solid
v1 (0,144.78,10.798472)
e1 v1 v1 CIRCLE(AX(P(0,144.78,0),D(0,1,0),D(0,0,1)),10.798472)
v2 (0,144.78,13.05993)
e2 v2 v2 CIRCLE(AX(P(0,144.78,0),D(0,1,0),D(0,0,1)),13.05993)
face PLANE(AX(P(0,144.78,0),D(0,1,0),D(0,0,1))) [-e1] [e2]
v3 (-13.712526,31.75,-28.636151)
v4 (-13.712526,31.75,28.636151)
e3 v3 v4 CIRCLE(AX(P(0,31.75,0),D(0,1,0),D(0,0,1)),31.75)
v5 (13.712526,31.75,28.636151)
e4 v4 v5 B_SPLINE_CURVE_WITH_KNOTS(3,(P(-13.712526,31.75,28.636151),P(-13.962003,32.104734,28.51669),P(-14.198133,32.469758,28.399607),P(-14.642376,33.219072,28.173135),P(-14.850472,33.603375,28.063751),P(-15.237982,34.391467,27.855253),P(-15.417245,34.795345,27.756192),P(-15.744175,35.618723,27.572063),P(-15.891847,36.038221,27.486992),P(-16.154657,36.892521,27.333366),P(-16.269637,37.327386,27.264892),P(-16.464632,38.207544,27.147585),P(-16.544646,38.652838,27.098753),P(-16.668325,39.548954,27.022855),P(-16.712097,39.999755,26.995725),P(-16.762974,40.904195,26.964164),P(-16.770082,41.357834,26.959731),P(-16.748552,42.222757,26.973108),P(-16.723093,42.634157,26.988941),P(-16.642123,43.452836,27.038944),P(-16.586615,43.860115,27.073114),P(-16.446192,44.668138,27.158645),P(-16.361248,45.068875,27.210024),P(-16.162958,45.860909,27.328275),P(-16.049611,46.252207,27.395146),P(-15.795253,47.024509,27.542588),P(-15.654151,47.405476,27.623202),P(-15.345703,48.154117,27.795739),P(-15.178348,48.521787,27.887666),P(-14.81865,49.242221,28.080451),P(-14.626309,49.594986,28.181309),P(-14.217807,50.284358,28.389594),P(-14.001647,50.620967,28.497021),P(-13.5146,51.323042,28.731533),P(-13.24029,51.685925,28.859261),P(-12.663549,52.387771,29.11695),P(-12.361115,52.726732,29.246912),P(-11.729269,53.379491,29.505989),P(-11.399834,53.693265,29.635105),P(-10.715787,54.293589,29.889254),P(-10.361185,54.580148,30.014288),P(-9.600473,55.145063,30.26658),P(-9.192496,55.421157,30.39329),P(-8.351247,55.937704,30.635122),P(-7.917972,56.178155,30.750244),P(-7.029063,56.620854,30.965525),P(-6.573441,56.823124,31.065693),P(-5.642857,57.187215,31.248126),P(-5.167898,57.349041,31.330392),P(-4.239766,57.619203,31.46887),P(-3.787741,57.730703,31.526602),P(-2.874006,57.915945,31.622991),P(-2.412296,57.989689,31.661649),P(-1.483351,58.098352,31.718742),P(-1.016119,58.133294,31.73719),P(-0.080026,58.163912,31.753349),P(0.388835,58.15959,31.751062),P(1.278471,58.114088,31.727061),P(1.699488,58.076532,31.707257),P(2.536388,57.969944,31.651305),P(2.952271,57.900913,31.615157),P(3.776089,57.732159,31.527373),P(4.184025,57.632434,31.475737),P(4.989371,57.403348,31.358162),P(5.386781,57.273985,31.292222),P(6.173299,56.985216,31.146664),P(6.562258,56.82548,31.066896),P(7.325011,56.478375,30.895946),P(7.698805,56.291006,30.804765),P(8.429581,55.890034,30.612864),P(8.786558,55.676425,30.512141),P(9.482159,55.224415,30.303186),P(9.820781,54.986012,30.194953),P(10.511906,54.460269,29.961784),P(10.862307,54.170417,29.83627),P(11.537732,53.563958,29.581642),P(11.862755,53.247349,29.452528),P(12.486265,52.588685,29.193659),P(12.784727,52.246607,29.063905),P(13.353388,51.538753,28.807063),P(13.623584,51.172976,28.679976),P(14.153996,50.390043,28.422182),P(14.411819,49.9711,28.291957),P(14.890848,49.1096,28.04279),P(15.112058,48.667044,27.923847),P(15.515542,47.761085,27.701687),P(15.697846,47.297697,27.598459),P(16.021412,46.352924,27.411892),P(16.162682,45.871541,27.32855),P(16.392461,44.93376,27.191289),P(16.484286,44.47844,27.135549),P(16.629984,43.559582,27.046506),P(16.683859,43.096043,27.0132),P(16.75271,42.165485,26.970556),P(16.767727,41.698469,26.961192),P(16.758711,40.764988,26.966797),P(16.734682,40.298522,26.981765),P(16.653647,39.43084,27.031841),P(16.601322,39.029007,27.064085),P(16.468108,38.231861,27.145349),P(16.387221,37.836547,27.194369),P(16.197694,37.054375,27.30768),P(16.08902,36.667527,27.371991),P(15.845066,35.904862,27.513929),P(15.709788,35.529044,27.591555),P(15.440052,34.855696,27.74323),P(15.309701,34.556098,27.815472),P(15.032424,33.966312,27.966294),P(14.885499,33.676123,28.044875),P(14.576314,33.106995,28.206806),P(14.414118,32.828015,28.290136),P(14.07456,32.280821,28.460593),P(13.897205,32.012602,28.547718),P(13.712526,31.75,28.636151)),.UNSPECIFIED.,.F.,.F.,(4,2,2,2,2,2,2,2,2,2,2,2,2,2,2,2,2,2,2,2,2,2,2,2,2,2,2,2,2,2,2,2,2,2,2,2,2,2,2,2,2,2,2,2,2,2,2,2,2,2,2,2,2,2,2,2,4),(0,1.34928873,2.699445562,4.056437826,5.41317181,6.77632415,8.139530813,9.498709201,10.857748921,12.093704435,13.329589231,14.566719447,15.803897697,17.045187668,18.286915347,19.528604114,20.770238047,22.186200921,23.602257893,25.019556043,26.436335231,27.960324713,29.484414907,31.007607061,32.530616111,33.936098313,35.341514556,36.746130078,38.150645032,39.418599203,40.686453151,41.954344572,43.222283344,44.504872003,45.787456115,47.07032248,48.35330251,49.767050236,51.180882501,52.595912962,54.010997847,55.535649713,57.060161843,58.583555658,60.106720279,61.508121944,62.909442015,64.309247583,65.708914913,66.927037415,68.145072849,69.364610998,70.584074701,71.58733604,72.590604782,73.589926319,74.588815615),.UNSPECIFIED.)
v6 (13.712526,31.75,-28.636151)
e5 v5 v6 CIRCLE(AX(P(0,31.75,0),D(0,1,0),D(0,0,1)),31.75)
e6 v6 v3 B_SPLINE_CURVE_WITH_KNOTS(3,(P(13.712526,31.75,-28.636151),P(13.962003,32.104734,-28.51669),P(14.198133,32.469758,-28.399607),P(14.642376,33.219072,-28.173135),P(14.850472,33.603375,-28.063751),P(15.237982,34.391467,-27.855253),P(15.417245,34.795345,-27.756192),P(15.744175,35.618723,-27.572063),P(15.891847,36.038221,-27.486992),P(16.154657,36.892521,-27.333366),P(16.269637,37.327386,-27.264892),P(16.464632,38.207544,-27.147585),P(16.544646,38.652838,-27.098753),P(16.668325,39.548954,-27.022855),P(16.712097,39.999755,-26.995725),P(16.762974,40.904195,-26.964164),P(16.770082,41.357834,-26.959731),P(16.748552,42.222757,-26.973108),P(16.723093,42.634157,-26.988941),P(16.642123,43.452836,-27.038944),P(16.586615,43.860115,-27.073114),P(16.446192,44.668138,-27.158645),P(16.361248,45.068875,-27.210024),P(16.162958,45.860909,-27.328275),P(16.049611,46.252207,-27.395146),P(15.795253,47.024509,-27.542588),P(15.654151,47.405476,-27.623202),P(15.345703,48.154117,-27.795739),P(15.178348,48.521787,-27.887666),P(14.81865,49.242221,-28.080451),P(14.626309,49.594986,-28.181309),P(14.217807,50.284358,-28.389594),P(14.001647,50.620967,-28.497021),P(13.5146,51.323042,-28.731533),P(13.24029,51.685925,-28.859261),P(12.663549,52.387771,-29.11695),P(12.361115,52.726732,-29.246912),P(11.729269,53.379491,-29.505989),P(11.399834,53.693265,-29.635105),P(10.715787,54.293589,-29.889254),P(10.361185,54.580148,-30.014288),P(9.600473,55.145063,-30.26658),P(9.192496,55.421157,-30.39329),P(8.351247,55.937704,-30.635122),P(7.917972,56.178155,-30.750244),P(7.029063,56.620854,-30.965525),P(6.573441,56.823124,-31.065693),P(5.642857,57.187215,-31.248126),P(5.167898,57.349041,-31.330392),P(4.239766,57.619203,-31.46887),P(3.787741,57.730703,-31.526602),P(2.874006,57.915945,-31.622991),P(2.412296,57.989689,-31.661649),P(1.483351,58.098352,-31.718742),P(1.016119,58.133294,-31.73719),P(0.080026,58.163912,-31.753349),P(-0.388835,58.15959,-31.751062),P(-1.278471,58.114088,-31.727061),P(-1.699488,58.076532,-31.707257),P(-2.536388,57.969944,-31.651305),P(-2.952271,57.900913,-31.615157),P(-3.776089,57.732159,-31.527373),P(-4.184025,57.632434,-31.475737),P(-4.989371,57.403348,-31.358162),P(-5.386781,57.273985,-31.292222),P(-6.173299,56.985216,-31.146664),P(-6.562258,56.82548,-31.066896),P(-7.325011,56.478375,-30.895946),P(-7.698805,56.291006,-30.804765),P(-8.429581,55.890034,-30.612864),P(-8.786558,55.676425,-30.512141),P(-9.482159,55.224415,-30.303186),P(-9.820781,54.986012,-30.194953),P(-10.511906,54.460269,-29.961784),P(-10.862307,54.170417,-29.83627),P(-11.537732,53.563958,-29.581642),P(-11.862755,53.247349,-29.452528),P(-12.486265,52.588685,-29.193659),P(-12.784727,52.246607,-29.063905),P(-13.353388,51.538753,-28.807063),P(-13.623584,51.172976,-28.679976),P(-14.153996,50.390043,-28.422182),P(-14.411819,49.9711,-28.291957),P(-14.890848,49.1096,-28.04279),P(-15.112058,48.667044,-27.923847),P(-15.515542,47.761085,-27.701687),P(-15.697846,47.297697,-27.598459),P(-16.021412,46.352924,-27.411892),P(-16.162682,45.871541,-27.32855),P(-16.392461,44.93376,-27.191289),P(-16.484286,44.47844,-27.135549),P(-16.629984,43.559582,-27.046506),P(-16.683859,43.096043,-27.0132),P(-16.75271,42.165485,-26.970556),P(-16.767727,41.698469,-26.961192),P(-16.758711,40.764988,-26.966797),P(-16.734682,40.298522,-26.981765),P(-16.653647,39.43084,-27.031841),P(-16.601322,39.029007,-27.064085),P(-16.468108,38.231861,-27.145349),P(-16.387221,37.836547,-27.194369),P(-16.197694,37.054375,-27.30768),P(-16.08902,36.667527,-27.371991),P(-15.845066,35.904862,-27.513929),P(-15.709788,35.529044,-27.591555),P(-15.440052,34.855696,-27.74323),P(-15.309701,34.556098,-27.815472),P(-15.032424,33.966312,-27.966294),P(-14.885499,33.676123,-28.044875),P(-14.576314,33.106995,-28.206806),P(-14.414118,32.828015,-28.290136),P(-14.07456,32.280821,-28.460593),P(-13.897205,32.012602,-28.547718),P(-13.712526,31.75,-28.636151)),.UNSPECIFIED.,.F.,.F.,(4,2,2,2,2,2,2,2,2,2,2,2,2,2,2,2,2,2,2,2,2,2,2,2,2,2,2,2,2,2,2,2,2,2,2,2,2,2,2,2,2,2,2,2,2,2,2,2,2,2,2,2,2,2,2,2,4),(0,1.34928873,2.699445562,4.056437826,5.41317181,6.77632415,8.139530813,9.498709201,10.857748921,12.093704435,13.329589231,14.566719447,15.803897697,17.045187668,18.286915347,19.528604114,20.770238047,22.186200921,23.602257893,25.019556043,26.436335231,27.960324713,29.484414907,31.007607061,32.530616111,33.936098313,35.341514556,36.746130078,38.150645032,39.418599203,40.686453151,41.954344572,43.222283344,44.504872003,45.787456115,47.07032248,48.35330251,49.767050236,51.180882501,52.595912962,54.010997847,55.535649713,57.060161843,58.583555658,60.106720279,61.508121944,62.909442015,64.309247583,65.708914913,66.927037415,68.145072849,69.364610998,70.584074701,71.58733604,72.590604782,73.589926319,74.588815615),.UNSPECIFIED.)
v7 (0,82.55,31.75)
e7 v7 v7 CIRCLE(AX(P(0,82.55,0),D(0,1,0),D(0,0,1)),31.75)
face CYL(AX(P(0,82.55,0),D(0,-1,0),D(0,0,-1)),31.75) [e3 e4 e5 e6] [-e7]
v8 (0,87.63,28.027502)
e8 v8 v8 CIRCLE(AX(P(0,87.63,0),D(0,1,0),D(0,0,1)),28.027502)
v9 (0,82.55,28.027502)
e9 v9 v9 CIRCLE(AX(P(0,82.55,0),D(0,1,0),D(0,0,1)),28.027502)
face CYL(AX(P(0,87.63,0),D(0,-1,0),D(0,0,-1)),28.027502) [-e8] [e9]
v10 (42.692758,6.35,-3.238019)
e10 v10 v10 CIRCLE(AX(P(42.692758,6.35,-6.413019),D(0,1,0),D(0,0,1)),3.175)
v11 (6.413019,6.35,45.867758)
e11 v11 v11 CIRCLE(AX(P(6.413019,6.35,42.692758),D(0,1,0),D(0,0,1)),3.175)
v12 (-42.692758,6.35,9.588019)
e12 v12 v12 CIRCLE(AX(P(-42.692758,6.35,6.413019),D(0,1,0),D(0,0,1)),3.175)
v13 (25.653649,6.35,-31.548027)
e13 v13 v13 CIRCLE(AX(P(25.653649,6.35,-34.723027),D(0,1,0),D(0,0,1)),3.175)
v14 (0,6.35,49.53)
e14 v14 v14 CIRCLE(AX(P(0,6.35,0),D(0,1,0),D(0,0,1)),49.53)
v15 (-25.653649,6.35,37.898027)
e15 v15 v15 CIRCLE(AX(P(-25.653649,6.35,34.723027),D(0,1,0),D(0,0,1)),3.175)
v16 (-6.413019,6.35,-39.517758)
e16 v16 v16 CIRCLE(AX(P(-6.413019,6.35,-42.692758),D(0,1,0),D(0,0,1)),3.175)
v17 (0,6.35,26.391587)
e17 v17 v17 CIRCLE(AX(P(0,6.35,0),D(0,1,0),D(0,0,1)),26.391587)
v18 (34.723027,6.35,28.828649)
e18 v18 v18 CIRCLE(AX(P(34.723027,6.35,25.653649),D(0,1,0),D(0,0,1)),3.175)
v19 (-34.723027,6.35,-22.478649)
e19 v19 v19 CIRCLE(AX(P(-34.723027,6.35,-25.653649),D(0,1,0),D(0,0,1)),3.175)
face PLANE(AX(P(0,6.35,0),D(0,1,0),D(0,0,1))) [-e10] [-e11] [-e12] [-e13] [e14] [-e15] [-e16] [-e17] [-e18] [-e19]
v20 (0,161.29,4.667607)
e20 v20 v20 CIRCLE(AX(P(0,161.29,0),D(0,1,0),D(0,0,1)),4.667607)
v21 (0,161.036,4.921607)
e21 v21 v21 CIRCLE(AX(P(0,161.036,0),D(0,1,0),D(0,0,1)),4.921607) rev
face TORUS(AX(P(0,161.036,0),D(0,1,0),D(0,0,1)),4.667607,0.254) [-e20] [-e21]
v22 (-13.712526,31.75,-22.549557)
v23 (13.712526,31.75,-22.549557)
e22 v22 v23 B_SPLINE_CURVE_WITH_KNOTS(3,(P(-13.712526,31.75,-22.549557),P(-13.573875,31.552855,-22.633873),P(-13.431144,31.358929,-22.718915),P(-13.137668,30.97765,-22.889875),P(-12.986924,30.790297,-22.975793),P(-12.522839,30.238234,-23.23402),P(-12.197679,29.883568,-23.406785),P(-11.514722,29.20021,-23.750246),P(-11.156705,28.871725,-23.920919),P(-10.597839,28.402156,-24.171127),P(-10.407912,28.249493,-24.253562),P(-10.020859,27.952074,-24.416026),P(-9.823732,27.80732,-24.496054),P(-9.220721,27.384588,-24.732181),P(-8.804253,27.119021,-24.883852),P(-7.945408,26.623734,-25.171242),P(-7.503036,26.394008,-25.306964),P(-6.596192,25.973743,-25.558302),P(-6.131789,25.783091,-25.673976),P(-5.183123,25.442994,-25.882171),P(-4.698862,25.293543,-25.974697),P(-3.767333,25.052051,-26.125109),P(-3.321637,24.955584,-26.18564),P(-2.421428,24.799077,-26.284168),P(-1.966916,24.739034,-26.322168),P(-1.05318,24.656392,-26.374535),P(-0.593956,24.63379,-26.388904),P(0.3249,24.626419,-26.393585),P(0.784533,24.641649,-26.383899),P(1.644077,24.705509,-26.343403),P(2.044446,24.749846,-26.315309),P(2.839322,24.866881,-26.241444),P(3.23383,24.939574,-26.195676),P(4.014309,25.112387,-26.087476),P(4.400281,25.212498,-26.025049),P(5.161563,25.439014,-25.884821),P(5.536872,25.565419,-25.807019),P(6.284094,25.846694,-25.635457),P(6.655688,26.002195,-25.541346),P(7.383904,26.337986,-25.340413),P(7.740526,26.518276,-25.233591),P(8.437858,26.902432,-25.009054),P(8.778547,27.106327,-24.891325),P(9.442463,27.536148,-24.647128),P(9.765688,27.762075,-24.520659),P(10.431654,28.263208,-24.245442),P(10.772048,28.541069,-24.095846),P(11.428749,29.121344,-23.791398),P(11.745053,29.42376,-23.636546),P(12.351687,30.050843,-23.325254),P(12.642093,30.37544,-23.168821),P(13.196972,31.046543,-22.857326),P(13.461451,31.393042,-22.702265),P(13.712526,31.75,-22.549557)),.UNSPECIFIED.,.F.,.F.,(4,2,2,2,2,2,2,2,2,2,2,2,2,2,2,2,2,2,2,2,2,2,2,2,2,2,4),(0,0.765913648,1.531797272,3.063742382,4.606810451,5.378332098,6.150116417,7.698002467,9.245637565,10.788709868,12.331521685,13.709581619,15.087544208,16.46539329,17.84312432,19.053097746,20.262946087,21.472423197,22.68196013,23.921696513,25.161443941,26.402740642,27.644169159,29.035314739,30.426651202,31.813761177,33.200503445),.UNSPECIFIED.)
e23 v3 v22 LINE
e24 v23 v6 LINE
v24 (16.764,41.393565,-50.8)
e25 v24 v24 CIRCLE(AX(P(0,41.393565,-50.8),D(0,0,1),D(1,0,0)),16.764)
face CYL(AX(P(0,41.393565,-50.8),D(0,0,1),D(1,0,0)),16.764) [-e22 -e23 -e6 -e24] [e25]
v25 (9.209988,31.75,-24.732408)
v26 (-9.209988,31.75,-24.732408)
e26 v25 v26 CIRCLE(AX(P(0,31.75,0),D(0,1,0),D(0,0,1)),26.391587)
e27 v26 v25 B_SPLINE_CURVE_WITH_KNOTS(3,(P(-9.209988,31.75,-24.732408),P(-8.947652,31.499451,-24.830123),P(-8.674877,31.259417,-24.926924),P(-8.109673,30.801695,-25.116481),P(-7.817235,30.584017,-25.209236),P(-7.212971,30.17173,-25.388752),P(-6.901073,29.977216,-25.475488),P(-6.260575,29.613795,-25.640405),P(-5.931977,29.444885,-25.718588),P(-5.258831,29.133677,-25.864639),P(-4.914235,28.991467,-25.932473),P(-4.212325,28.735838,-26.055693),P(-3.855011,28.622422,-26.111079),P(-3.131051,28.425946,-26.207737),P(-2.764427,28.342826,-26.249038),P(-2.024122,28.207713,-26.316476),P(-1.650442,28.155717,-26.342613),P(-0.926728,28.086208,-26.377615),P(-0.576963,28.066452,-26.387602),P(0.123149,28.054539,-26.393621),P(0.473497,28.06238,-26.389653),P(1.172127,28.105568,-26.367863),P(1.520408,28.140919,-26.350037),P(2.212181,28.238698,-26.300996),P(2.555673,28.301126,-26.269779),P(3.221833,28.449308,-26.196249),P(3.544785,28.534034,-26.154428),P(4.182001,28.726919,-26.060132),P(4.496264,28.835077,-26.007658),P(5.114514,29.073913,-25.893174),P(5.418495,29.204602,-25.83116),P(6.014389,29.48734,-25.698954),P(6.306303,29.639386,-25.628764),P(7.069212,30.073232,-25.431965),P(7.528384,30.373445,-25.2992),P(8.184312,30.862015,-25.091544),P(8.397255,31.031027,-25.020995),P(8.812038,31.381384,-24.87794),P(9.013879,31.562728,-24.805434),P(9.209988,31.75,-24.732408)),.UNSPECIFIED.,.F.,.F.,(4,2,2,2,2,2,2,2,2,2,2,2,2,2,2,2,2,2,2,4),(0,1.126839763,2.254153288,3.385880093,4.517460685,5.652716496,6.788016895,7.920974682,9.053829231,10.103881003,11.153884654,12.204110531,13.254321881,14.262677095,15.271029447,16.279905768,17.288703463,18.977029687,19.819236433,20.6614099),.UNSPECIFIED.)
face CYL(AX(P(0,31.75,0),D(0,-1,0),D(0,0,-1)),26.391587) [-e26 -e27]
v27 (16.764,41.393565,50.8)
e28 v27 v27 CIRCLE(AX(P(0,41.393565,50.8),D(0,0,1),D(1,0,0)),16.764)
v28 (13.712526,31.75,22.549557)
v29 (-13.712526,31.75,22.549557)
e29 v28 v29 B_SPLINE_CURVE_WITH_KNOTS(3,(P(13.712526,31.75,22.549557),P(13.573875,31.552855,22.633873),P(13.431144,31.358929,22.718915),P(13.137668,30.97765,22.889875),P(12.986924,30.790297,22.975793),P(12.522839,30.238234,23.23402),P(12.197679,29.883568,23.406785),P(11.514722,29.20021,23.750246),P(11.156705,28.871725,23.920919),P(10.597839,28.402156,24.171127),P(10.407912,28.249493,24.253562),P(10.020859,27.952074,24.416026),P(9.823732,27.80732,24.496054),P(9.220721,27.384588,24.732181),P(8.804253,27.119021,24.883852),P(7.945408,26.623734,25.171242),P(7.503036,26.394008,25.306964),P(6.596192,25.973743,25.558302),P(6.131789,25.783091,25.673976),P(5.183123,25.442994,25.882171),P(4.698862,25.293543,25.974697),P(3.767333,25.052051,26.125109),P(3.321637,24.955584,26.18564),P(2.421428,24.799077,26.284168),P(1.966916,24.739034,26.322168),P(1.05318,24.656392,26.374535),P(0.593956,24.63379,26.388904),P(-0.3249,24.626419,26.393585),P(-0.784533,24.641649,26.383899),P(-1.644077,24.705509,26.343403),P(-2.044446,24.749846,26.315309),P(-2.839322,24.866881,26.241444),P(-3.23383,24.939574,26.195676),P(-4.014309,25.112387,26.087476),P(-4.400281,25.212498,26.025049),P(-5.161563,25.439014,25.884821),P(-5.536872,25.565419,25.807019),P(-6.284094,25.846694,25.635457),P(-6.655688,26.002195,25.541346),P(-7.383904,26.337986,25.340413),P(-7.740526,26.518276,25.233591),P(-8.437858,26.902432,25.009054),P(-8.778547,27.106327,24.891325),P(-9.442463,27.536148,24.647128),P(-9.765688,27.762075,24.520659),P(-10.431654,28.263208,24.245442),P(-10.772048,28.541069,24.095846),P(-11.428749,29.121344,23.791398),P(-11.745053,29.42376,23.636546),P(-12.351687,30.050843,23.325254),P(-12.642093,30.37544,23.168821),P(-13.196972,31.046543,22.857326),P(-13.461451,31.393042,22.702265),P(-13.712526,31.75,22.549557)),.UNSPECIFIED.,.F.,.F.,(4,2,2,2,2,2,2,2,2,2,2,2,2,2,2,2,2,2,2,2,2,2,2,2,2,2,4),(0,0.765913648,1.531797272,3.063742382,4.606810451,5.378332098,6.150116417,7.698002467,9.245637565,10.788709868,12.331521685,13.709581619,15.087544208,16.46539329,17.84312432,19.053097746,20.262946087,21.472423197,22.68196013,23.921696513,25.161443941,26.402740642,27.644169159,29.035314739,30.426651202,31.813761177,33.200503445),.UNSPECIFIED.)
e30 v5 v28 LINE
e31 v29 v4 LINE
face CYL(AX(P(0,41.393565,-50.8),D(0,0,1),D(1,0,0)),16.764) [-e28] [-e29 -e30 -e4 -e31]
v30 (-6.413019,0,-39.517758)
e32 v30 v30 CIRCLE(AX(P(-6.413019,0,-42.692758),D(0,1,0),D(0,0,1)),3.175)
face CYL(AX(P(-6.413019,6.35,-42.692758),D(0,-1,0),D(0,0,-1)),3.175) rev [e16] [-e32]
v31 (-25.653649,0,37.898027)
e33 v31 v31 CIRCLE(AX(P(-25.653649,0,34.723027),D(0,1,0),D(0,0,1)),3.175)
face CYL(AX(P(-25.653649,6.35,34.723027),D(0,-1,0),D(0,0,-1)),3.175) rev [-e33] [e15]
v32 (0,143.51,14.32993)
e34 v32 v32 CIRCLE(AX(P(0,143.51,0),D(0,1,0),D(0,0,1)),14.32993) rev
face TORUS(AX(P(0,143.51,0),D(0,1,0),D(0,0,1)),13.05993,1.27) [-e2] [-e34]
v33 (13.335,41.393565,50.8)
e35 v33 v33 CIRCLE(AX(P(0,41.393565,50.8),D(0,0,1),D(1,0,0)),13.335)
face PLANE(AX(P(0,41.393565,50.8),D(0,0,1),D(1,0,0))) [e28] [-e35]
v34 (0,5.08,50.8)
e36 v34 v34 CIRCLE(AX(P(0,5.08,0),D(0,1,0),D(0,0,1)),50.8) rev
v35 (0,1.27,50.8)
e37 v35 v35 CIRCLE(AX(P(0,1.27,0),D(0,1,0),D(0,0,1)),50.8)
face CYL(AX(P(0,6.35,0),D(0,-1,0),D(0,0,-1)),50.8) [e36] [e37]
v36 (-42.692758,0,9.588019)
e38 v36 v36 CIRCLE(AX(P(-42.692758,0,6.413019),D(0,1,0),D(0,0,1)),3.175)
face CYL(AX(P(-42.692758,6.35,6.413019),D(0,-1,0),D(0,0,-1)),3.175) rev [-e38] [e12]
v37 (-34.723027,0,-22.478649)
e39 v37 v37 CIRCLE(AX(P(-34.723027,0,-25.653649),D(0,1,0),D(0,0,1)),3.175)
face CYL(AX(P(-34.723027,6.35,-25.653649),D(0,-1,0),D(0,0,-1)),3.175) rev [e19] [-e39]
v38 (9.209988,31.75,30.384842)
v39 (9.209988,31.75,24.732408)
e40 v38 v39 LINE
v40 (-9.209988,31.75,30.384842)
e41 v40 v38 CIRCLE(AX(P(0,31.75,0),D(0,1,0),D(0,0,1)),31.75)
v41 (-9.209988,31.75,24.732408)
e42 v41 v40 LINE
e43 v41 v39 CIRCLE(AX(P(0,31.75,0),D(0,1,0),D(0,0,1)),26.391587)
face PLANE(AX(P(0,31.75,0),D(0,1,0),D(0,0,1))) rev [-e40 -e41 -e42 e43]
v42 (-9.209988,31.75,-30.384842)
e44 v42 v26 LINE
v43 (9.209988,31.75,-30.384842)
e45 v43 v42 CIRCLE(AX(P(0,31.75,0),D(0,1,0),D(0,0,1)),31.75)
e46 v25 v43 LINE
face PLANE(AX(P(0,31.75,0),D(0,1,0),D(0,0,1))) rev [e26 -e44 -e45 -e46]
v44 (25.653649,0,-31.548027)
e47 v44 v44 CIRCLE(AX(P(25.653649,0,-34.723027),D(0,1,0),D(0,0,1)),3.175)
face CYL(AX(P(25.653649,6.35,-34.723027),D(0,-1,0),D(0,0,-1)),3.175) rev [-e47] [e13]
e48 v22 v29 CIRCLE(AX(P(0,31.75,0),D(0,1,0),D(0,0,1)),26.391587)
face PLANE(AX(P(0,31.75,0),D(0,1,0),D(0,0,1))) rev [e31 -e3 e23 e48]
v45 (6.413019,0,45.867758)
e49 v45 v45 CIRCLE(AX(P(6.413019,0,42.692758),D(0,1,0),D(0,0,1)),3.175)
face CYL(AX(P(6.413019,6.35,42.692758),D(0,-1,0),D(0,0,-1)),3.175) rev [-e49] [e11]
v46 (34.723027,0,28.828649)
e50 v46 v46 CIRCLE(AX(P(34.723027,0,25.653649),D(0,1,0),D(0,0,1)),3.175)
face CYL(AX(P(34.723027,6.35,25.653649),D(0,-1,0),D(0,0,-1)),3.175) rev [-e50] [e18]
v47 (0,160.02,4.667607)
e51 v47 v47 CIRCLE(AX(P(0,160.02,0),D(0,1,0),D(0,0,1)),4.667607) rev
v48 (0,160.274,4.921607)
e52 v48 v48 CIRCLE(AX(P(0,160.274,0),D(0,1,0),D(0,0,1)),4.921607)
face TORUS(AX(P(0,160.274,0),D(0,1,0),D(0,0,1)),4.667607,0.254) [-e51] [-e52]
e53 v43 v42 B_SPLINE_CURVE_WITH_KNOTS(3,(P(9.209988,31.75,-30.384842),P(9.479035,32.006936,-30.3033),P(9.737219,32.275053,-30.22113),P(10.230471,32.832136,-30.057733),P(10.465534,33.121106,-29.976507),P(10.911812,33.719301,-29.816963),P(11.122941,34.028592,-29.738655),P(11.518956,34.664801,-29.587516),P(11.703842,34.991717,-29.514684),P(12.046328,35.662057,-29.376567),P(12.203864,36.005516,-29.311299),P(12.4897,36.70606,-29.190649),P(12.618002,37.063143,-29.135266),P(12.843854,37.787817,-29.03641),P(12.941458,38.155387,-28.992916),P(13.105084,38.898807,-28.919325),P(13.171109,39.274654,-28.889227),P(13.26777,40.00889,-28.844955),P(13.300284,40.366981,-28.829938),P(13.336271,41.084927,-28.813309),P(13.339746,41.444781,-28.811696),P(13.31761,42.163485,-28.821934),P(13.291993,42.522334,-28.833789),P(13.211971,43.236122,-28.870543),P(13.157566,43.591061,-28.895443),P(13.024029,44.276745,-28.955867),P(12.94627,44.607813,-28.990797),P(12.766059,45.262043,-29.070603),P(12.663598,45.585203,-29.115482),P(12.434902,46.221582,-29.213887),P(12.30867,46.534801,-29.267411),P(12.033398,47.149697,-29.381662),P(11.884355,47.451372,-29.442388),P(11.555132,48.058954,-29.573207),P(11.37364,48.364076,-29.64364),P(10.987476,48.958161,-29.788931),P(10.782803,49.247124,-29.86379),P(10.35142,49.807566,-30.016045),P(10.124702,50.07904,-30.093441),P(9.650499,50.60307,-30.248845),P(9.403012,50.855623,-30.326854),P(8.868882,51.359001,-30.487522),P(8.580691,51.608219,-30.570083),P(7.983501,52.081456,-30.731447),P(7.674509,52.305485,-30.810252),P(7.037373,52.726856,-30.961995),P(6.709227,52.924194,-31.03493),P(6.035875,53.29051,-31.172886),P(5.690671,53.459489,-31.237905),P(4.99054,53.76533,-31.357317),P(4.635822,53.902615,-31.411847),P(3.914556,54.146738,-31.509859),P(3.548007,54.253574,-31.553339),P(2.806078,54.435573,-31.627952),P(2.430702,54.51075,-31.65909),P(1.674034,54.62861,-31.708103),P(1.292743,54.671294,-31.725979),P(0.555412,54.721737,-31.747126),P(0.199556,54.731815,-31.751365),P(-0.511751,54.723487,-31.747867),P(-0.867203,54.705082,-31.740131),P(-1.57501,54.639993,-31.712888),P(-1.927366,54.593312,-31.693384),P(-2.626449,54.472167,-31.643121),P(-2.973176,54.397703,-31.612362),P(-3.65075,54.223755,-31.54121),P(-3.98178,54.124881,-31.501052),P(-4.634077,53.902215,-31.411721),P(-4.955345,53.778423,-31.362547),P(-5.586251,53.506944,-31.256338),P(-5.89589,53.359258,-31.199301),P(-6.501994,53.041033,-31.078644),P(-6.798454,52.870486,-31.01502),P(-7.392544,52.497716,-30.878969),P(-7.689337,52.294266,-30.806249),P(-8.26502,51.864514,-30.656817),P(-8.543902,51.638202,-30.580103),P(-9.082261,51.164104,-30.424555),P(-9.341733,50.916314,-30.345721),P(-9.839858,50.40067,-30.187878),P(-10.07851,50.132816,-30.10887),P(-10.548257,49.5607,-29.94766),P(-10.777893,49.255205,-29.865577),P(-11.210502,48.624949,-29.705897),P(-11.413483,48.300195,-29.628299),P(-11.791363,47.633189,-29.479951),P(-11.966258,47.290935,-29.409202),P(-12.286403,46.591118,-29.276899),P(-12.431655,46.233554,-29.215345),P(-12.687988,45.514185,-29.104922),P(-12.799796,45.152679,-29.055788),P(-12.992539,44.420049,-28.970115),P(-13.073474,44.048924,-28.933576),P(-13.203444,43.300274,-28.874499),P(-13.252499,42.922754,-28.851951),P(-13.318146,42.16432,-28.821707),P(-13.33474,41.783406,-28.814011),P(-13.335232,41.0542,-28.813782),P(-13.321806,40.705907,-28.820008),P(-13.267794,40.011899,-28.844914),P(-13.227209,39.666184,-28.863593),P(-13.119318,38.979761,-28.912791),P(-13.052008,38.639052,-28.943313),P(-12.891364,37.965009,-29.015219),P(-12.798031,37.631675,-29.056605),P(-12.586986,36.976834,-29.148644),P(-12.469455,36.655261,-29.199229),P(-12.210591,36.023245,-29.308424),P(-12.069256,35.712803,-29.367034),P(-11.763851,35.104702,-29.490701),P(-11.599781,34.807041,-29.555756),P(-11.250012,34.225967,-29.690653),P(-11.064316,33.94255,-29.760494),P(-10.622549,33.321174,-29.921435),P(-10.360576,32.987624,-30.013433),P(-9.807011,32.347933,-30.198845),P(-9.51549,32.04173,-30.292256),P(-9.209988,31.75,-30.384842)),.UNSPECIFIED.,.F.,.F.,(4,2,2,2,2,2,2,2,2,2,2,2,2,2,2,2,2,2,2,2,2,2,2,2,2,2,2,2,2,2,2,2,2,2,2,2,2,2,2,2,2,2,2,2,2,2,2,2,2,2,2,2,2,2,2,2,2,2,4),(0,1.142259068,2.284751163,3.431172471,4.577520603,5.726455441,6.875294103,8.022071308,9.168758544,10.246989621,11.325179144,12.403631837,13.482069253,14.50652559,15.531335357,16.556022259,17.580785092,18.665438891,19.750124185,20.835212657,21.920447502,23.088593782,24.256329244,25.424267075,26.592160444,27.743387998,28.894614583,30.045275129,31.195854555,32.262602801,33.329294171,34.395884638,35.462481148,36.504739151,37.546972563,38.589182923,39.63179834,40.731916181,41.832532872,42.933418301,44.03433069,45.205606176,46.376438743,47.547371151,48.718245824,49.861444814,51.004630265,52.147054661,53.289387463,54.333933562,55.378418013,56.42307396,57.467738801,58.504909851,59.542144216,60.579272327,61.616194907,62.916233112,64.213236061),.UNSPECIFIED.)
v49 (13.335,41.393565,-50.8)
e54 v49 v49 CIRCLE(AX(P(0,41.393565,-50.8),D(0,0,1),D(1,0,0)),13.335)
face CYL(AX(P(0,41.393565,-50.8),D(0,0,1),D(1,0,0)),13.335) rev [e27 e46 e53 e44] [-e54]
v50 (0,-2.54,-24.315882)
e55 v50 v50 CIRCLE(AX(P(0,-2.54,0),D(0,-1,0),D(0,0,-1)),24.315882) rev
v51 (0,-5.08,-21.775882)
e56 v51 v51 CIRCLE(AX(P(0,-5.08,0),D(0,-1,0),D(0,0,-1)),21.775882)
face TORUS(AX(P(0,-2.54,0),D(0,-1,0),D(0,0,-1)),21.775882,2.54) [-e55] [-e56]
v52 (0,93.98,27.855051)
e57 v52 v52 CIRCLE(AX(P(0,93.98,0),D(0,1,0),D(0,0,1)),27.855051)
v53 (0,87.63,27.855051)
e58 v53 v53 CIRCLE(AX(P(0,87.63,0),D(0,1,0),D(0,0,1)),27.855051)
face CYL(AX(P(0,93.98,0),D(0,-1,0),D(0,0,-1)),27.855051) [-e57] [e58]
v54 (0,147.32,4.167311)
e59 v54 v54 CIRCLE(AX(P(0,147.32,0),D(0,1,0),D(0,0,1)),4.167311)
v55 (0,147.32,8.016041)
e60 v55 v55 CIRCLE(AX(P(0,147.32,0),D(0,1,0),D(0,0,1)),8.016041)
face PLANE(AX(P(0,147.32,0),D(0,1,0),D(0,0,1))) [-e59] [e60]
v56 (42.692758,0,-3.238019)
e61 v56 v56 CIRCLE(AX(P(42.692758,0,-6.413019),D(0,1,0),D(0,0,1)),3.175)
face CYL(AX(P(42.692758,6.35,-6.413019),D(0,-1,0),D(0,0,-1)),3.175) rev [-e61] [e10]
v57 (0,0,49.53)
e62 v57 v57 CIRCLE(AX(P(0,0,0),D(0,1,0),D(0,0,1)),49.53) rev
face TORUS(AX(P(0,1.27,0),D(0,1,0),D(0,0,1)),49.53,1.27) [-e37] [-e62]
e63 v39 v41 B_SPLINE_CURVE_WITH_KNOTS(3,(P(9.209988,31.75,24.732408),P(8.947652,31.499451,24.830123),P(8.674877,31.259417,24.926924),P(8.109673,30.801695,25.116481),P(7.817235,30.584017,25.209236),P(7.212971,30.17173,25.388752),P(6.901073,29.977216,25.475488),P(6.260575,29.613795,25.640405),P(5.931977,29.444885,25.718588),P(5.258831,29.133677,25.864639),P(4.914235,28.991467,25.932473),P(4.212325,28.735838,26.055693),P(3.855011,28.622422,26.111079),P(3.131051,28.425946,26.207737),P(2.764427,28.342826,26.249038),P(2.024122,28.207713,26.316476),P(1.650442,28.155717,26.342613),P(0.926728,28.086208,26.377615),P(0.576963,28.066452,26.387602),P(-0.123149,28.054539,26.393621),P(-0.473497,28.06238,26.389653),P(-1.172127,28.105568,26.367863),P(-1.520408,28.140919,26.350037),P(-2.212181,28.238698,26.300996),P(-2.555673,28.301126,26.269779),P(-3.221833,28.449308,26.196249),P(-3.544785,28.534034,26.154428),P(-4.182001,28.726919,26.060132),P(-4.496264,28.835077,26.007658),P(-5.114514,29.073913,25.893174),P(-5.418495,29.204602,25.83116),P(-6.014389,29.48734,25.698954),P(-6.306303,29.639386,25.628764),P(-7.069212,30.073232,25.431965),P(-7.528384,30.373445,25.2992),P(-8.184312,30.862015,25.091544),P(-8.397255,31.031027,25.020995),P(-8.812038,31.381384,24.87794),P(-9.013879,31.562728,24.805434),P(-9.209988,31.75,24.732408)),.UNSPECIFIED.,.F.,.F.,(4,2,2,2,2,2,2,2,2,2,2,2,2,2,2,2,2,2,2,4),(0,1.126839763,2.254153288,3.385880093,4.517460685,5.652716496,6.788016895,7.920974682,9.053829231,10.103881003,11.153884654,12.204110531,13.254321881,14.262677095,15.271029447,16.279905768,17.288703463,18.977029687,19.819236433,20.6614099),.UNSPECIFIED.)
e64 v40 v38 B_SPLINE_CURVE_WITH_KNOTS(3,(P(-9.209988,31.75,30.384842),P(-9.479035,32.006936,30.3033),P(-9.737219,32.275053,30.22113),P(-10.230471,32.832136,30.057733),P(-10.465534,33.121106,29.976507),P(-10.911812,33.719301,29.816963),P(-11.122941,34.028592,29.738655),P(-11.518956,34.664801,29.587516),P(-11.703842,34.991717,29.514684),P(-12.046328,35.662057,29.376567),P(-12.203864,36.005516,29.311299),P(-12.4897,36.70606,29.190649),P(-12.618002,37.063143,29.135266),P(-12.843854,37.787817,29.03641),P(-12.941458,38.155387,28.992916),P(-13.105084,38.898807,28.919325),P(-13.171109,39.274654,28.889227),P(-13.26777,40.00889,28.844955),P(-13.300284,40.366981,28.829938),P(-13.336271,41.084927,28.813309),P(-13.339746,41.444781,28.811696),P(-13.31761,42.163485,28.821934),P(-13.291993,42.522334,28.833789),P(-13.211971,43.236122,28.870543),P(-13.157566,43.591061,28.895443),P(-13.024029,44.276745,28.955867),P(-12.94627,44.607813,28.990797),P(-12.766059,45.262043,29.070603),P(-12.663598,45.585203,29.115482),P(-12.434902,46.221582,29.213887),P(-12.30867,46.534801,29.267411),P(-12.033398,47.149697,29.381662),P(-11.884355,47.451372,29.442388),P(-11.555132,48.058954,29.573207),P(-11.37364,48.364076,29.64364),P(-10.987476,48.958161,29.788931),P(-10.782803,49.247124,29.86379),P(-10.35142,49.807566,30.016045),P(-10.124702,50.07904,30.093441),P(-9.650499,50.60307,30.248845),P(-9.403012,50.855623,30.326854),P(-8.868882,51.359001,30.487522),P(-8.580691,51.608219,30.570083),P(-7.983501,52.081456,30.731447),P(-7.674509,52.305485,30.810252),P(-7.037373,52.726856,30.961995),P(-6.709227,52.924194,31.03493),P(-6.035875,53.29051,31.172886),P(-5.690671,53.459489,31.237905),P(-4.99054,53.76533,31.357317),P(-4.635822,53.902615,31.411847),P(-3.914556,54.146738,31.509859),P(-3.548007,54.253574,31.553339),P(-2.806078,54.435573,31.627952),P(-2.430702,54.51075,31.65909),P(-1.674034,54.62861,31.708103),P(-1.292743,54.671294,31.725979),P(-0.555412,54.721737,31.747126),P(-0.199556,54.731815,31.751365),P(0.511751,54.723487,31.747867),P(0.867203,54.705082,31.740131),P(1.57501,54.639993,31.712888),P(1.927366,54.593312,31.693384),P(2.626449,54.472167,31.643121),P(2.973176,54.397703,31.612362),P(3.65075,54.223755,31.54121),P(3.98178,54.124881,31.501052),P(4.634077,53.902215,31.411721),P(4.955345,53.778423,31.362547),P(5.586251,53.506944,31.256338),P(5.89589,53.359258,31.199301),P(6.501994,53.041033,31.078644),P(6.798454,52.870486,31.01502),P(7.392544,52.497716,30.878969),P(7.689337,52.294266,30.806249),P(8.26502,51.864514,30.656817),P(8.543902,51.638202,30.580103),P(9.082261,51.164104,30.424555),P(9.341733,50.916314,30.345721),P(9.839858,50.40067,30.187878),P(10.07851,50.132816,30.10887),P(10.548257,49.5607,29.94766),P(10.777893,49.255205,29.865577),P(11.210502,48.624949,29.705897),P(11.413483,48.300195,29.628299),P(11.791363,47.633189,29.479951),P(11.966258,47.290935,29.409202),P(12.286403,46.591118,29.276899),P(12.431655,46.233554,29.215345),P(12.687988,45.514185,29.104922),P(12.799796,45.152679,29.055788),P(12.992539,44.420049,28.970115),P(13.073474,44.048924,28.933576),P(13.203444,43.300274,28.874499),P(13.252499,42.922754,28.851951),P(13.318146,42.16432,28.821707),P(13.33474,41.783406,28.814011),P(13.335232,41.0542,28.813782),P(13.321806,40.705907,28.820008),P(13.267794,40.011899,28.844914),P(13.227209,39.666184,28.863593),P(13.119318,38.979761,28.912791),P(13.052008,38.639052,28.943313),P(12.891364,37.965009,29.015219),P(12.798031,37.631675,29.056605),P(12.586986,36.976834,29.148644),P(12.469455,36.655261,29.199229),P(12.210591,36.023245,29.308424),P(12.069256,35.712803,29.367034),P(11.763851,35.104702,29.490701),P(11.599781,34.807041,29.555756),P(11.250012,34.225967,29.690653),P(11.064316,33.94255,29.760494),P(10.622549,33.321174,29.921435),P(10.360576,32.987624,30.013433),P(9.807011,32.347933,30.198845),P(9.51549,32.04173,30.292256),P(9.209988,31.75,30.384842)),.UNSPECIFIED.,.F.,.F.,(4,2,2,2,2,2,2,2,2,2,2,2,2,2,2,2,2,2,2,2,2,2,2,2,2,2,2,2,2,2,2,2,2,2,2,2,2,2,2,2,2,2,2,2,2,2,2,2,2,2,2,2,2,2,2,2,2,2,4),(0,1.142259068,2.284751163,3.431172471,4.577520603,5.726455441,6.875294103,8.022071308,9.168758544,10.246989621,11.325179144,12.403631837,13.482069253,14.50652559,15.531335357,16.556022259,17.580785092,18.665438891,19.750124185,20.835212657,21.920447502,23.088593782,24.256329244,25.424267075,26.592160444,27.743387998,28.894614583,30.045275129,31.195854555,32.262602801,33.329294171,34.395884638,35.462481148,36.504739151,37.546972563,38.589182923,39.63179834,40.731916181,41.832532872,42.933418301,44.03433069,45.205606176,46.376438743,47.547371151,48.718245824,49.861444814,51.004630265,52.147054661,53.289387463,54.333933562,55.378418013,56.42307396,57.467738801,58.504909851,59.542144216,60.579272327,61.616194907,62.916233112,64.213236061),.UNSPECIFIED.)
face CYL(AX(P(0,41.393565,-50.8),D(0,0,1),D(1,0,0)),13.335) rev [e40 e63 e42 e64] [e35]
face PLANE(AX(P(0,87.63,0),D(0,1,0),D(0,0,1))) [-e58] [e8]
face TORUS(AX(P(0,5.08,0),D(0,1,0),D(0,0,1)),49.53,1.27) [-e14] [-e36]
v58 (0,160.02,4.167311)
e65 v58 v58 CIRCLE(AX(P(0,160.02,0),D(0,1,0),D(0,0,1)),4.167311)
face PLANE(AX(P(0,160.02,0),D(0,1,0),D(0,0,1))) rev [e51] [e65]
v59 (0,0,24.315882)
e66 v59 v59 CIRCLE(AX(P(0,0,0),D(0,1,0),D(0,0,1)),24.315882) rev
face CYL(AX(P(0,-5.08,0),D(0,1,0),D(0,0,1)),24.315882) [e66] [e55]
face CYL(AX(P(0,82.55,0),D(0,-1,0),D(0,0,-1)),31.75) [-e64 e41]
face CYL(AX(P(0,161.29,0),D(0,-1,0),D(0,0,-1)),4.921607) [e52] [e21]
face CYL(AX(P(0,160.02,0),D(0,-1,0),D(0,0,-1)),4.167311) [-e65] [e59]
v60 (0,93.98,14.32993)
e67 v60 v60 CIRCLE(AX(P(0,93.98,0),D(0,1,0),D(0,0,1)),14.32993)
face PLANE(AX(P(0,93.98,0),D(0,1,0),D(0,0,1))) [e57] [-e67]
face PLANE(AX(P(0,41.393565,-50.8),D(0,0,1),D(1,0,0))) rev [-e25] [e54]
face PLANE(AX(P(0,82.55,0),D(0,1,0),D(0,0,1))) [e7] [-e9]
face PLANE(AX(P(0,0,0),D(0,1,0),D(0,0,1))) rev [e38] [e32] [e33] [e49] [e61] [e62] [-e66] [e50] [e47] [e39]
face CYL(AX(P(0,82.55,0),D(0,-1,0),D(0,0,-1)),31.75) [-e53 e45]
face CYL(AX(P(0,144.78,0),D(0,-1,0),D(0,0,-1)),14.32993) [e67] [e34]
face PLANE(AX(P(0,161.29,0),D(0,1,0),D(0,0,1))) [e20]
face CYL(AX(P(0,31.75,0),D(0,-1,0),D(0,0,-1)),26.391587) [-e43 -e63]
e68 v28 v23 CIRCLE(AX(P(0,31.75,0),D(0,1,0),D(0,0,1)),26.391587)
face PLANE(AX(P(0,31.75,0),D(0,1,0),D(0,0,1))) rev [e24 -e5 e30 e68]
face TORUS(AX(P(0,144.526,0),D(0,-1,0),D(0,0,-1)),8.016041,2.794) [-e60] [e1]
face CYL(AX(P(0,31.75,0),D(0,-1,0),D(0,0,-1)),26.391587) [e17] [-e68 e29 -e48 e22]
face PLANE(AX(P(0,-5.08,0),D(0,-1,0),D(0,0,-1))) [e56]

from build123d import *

# Parameters (mm, degrees)
SKETCH1_R                = 50.8
SKETCH1_R_2              = 3.175
BOSS_EXTRUDE1_DEPTH      = 6.35
FILLET1_R                = 1.27
FILLET2_R                = 1.27
SKETCH2_R                = 26.391587244
BOSS_EXTRUDE2_DEPTH      = 25.4
SKETCH3_R                = 31.75
BOSS_EXTRUDE3_DEPTH      = 50.8
BOSS_EXTRUDE4_DEPTH      = 50.8
BOSS_EXTRUDE4_DEPTH_BACK = 50.8
SKETCH4_R                = 16.764
SKETCH4_R_2              = 13.335
SKETCH5_R                = 24.315881968
BOSS_EXTRUDE5_DEPTH      = 5.08
FILLET3_R                = 2.54
SKETCH6_R                = 28.027502095
BOSS_EXTRUDE6_DEPTH      = 5.08
SKETCH7_R                = 27.855051321
BOSS_EXTRUDE7_DEPTH      = 6.35
SKETCH8_R                = 14.329930432
BOSS_EXTRUDE8_DEPTH      = 50.8
SKETCH9_R                = 10.798471599
BOSS_EXTRUDE9_DEPTH      = 2.54
SKETCH10_R               = 4.167310688
BOSS_EXTRUDE10_DEPTH     = 12.7
SKETCH11_R               = 4.921606902
BOSS_EXTRUDE11_DEPTH     = 1.27
FILLET7_R                = 0.254
FILLET8_R                = 2.794
FILLET9_R                = 1.27


with BuildPart() as part:
    # Sketch1 → Boss-Extrude1 (new body)
    with BuildSketch(Plane(origin=(0, 0, 0), x_dir=(1, 0, 0), z_dir=(0, 1, 0))):
        with Locations(Location((0, 0, 0), (0, 0, 270))):
            Circle(SKETCH1_R)
        with Locations(Location((-6.413018611, 42.692757586, 0), (0, 0, 270))):
            Circle(SKETCH1_R_2, mode=Mode.SUBTRACT)
        with Locations(Location((25.653649449, 34.723027344, 0), (0, 0, 270))):
            Circle(SKETCH1_R_2, mode=Mode.SUBTRACT)
        with Locations(Location((42.692757586, 6.413018611, 0), (0, 0, 270))):
            Circle(SKETCH1_R_2, mode=Mode.SUBTRACT)
        with Locations(Location((34.723027344, -25.653649449, 0), (0, 0, 270))):
            Circle(SKETCH1_R_2, mode=Mode.SUBTRACT)
        with Locations(Location((6.413018611, -42.692757586, 0), (0, 0, 270))):
            Circle(SKETCH1_R_2, mode=Mode.SUBTRACT)
        with Locations(Location((-25.653649449, -34.723027344, 0), (0, 0, 270))):
            Circle(SKETCH1_R_2, mode=Mode.SUBTRACT)
        with Locations(Location((-42.692757586, -6.413018611, 0), (0, 0, 270))):
            Circle(SKETCH1_R_2, mode=Mode.SUBTRACT)
        with Locations(Location((-34.723027344, 25.653649449, 0), (0, 0, 270))):
            Circle(SKETCH1_R_2, mode=Mode.SUBTRACT)
    extrude(amount=BOSS_EXTRUDE1_DEPTH)

    # Fillet1
    fillet1_edges = [part.edges().sort_by_distance(p)[0] for p in [
        (0, 6.35, -50.8),
    ]]
    fillet(fillet1_edges, radius=FILLET1_R)

    # Fillet2
    fillet2_edges = [part.edges().sort_by_distance(p)[0] for p in [
        (0, 0, -50.8),
    ]]
    fillet(fillet2_edges, radius=FILLET2_R)

    # Sketch2 → Boss-Extrude2 (add)
    with BuildSketch(Plane(origin=(0, 6.35, 0), x_dir=(1, 0, 0), z_dir=(0, 1, 0))):
        with Locations(Location((0, 0, 0), (0, 0, 270))):
            Circle(SKETCH2_R)
    extrude(amount=BOSS_EXTRUDE2_DEPTH)

    # Sketch3 → Boss-Extrude3 (add)
    with BuildSketch(Plane(origin=(0, 31.75, 0), x_dir=(1, 0, 0), z_dir=(0, 1, 0))):
        with Locations(Location((0, 0, 0), (0, 0, 270))):
            Circle(SKETCH3_R)
    extrude(amount=BOSS_EXTRUDE3_DEPTH)

    # Sketch4 → Boss-Extrude4 (add, two sides: drawn at the far end of the back side and taken through both)
    with BuildSketch(Plane.XY.offset(-BOSS_EXTRUDE4_DEPTH_BACK)):
        with Locations((0, 41.393564688)):
            Circle(SKETCH4_R)
        with Locations((0, 41.393564688)):
            Circle(SKETCH4_R_2, mode=Mode.SUBTRACT)
    extrude(amount=BOSS_EXTRUDE4_DEPTH + BOSS_EXTRUDE4_DEPTH_BACK)

    # Sketch5 → Boss-Extrude5 (add)
    with BuildSketch(Plane.XZ):
        with Locations(Location((0, 0, 0), (0, 0, 90))):
            Circle(SKETCH5_R)
    extrude(amount=BOSS_EXTRUDE5_DEPTH)

    # Fillet3
    fillet3_edges = [part.edges().sort_by_distance(p)[0] for p in [
        (0, -5.08, -24.315881968),
    ]]
    fillet(fillet3_edges, radius=FILLET3_R)

    # Sketch6 → Boss-Extrude6 (add)
    with BuildSketch(Plane(origin=(0, 82.55, 0), x_dir=(1, 0, 0), z_dir=(0, 1, 0))):
        with Locations(Location((0, 0, 0), (0, 0, 270))):
            Circle(SKETCH6_R)
    extrude(amount=BOSS_EXTRUDE6_DEPTH)

    # Sketch7 → Boss-Extrude7 (add)
    with BuildSketch(Plane(origin=(0, 87.63, 0), x_dir=(1, 0, 0), z_dir=(0, 1, 0))):
        with Locations(Location((0, 0, 0), (0, 0, 270))):
            Circle(SKETCH7_R)
    extrude(amount=BOSS_EXTRUDE7_DEPTH)

    # Sketch8 → Boss-Extrude8 (add)
    with BuildSketch(Plane(origin=(0, 93.98, 0), x_dir=(1, 0, 0), z_dir=(0, 1, 0))):
        with Locations(Location((0, 0, 0), (0, 0, 270))):
            Circle(SKETCH8_R)
    extrude(amount=BOSS_EXTRUDE8_DEPTH)

    # Sketch9 → Boss-Extrude9 (add)
    with BuildSketch(Plane(origin=(0, 144.78, 0), x_dir=(1, 0, 0), z_dir=(0, 1, 0))):
        with Locations(Location((0, 0, 0), (0, 0, 270))):
            Circle(SKETCH9_R)
    extrude(amount=BOSS_EXTRUDE9_DEPTH)

    # Sketch10 → Boss-Extrude10 (add)
    with BuildSketch(Plane(origin=(0, 147.32, 0), x_dir=(1, 0, 0), z_dir=(0, 1, 0))):
        with Locations(Location((0, 0, 0), (0, 0, 270))):
            Circle(SKETCH10_R)
    extrude(amount=BOSS_EXTRUDE10_DEPTH)

    # Sketch11 → Boss-Extrude11 (add)
    with BuildSketch(Plane(origin=(0, 160.02, 0), x_dir=(1, 0, 0), z_dir=(0, 1, 0))):
        with Locations(Location((0, 0, 0), (0, 0, 270))):
            Circle(SKETCH11_R)
    extrude(amount=BOSS_EXTRUDE11_DEPTH)

    # Fillet7
    fillet7_edges = [part.edges().sort_by_distance(p)[0] for p in [
        (0, 160.02, -4.921606902),
        (0, 161.29, -4.921606902),
    ]]
    fillet(fillet7_edges, radius=FILLET7_R)

    # Fillet8
    # the kernel refuses this fillet: 2.794 mm, written as the material it takes off along each edge
    with BuildSketch(Plane(origin=(0, 147.32, 0), x_dir=(0, 0, 1), z_dir=(-1, 0, 0))) as fillet8_piece_1:
        with BuildLine():
            CenterArc((8.016041007, -2.794), FILLET8_R, 5.21590857, 84.78409143)
            Line((10.798471599, -2.54), (10.854120211, -2.53492))
            ThreePointArc((10.854120211, -2.53492), (10.854351599, -1.27), (10.854351599, 0))
            Line((10.854351599, 0), (10.798471599, 0.05588))
            Line((10.798471599, 0.05588), (8.016041007, 0.05588))
            Line((8.016041007, 0.05588), (8.016041007, 0))
        make_face()
    revolve(axis=Axis((0, 147.32, 0), (0, 1, 0)), mode=Mode.SUBTRACT)

    # Fillet9
    fillet9_edges = [part.edges().sort_by_distance(p)[0] for p in [
        (0, 144.78, -14.329930432),
    ]]
    fillet(fillet9_edges, radius=FILLET9_R)


solid = part.part
